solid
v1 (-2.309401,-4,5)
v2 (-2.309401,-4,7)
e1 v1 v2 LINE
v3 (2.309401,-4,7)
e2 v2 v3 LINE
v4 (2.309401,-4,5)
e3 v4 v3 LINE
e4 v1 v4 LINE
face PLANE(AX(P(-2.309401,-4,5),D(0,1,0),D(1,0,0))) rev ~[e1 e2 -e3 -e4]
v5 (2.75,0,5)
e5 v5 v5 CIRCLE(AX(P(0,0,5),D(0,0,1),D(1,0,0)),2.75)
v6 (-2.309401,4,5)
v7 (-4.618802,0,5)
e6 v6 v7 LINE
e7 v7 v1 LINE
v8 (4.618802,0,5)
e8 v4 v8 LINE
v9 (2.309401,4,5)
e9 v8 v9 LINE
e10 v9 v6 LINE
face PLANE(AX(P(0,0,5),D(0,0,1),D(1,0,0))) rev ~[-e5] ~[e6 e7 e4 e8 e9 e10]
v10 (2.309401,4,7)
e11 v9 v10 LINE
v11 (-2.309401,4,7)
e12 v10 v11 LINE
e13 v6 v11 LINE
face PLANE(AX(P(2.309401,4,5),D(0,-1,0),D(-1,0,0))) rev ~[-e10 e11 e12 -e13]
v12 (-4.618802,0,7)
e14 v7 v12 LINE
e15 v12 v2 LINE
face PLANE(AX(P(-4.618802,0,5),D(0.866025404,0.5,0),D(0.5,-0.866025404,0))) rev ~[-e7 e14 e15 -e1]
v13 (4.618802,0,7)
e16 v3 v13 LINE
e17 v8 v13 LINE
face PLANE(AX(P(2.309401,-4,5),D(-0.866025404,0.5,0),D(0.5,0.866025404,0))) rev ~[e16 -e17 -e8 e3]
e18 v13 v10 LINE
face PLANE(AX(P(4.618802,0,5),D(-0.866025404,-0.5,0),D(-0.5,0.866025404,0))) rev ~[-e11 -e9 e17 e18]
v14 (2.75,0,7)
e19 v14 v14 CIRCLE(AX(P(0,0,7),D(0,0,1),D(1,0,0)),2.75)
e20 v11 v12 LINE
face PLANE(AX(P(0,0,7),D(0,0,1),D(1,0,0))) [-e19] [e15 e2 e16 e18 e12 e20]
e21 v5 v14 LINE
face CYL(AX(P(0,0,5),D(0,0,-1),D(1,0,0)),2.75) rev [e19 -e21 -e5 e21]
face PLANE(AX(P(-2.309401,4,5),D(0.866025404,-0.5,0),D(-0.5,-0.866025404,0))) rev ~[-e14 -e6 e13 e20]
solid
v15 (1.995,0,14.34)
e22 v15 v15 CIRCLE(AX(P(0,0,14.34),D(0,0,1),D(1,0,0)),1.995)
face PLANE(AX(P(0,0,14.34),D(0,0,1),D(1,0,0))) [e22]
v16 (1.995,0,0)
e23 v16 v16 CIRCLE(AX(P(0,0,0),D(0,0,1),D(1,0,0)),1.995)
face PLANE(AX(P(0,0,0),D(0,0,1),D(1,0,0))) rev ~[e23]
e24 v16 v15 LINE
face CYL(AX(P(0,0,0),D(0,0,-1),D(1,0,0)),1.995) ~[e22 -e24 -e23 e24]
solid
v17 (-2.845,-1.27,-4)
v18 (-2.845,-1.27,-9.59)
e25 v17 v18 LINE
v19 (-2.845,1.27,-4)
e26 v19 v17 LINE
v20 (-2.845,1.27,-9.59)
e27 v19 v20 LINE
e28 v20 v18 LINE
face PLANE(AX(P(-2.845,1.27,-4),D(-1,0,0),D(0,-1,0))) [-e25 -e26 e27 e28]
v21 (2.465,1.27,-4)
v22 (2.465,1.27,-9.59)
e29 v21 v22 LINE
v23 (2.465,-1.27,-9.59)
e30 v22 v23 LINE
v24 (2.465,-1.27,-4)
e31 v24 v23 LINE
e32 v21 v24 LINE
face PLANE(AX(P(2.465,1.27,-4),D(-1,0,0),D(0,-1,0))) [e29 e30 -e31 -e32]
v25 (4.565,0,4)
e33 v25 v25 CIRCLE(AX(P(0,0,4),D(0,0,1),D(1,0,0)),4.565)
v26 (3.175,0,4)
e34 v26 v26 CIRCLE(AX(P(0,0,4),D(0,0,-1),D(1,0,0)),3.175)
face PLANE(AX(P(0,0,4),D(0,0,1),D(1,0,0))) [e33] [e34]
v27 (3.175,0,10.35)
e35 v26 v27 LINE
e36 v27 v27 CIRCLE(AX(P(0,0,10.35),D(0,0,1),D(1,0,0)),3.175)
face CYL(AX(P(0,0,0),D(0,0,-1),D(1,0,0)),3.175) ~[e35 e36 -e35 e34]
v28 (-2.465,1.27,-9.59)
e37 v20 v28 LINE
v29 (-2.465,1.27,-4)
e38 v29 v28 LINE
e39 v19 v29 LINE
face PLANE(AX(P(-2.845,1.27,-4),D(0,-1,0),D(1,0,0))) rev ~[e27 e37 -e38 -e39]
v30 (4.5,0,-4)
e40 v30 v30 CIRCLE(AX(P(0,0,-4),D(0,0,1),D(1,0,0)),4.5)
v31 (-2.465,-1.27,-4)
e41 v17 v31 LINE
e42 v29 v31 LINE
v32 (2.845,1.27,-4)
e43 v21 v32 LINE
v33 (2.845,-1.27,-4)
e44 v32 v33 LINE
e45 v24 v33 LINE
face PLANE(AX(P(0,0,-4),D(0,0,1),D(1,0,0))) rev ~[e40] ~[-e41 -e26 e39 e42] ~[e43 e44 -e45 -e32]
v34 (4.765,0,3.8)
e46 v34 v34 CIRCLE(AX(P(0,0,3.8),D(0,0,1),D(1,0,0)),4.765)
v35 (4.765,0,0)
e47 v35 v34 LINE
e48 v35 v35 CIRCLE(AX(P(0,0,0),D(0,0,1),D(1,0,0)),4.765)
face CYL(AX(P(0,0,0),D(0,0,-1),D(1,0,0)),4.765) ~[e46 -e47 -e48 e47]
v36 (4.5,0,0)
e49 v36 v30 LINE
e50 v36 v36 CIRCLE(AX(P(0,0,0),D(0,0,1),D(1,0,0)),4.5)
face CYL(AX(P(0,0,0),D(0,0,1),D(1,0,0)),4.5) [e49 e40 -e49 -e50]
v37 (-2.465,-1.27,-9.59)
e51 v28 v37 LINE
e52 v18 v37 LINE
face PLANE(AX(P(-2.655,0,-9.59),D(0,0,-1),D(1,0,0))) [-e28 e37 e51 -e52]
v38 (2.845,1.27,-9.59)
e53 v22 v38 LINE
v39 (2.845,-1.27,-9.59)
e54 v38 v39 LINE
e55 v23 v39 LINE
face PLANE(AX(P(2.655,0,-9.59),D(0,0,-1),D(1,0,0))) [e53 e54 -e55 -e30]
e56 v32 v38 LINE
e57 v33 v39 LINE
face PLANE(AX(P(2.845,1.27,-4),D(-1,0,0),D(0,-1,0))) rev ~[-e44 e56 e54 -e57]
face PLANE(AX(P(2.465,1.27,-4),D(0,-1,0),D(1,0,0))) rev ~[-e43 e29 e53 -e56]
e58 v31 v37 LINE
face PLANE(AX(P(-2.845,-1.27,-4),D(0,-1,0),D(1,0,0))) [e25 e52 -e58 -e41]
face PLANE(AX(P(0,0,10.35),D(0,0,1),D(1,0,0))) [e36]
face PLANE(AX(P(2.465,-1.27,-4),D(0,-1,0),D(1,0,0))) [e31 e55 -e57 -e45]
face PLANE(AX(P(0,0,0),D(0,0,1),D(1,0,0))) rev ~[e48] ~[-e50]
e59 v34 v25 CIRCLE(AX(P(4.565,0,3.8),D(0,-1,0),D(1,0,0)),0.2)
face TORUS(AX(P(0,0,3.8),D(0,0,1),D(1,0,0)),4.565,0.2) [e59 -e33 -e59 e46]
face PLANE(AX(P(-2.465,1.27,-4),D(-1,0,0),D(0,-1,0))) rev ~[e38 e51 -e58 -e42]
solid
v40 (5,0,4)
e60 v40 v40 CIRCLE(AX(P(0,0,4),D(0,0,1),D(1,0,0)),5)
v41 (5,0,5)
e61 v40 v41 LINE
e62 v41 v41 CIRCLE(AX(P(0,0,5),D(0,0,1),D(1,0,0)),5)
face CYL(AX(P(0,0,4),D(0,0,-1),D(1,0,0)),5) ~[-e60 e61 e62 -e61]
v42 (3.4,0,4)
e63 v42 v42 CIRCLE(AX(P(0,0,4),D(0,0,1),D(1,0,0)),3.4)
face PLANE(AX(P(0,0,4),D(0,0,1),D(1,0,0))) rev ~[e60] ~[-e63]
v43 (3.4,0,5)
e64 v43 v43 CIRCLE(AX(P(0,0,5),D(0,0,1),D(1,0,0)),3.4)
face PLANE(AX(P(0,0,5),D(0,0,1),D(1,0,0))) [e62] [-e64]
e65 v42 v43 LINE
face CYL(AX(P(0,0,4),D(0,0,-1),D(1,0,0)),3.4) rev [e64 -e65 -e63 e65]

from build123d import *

# Parameters (mm, degrees)
F0_R      = 1.995
F1_DEPTH  = 14.34
F0_R_2    = 3.175
F2_DEPTH  = 10.35
F0_R_3    = 4.765
F0_R_4    = 4.5
F3_DEPTH  = 4
F4_DEPTH  = 4
F5_W      = 0.38
F5_H      = 2.54
F6_DEPTH  = 5.59
F7_R      = 0.2
F8_R      = 5
F8_R_2    = 3.4
F9_DEPTH  = 1
F10_R     = 2.75
F11_DEPTH = 2


with BuildPart() as f1:
    # F0 (on Top) → F1 (new body)
    with BuildSketch(Plane.XY):
        Circle(F0_R)
    extrude(amount=F1_DEPTH)


with BuildPart() as f2:
    # F0 (on Top) → F2 (new body)
    with BuildSketch(Plane.XY):
        Circle(F0_R_2)
        Circle(F0_R, mode=Mode.SUBTRACT)
        Circle(F0_R)
    extrude(amount=F2_DEPTH)

    # F0 (on Top) → F3 (join)
    with BuildSketch(Plane.XY):
        Circle(F0_R_3)
        Circle(F0_R_4, mode=Mode.SUBTRACT)
        Circle(F0_R_4)
        Circle(F0_R_2, mode=Mode.SUBTRACT)
        Circle(F0_R_2)
        Circle(F0_R, mode=Mode.SUBTRACT)
        Circle(F0_R)
    extrude(amount=F3_DEPTH)

    # F0 (on Top) → F4 (join)
    with BuildSketch(Plane.XY):
        Circle(F0_R_4)
        Circle(F0_R_2, mode=Mode.SUBTRACT)
        Circle(F0_R_2)
        Circle(F0_R, mode=Mode.SUBTRACT)
        Circle(F0_R)
    extrude(amount=-F4_DEPTH)

    # F5 (on face) → F6 (join)
    with BuildSketch(Plane(origin=(0, 0, -4), x_dir=(1, 0, 0), z_dir=(0, 0, -1))):
        with Locations((-2.655, 0)):
            Rectangle(F5_W, F5_H)
        with Locations((2.655, 0)):
            Rectangle(F5_W, F5_H)
    extrude(amount=F6_DEPTH)

    # F7
    f7_edges = [f2.edges().sort_by_distance(p)[0] for p in [
        (-4.765, 0, 4),
    ]]
    fillet(f7_edges, radius=F7_R)


with BuildPart() as f9:
    # F8 (on face) → F9 (new body)
    with BuildSketch(Plane.XY.offset(4)):
        Circle(F8_R)
        Circle(F8_R_2, mode=Mode.SUBTRACT)
    extrude(amount=F9_DEPTH)


with BuildPart() as f11:
    # F10 (on face) → F11 (new body)
    with BuildSketch(Plane.XY.offset(5)):
        Polygon((2.3094010768, 4), (-2.3094010768, 4), (-4.6188021535, 0), (-2.3094010768, -4), (2.3094010768, -4), (4.6188021535, 0), align=None)
        Circle(F10_R, mode=Mode.SUBTRACT)
    extrude(amount=F11_DEPTH)


solid = Compound([f1.part, f2.part, f9.part, f11.part])
